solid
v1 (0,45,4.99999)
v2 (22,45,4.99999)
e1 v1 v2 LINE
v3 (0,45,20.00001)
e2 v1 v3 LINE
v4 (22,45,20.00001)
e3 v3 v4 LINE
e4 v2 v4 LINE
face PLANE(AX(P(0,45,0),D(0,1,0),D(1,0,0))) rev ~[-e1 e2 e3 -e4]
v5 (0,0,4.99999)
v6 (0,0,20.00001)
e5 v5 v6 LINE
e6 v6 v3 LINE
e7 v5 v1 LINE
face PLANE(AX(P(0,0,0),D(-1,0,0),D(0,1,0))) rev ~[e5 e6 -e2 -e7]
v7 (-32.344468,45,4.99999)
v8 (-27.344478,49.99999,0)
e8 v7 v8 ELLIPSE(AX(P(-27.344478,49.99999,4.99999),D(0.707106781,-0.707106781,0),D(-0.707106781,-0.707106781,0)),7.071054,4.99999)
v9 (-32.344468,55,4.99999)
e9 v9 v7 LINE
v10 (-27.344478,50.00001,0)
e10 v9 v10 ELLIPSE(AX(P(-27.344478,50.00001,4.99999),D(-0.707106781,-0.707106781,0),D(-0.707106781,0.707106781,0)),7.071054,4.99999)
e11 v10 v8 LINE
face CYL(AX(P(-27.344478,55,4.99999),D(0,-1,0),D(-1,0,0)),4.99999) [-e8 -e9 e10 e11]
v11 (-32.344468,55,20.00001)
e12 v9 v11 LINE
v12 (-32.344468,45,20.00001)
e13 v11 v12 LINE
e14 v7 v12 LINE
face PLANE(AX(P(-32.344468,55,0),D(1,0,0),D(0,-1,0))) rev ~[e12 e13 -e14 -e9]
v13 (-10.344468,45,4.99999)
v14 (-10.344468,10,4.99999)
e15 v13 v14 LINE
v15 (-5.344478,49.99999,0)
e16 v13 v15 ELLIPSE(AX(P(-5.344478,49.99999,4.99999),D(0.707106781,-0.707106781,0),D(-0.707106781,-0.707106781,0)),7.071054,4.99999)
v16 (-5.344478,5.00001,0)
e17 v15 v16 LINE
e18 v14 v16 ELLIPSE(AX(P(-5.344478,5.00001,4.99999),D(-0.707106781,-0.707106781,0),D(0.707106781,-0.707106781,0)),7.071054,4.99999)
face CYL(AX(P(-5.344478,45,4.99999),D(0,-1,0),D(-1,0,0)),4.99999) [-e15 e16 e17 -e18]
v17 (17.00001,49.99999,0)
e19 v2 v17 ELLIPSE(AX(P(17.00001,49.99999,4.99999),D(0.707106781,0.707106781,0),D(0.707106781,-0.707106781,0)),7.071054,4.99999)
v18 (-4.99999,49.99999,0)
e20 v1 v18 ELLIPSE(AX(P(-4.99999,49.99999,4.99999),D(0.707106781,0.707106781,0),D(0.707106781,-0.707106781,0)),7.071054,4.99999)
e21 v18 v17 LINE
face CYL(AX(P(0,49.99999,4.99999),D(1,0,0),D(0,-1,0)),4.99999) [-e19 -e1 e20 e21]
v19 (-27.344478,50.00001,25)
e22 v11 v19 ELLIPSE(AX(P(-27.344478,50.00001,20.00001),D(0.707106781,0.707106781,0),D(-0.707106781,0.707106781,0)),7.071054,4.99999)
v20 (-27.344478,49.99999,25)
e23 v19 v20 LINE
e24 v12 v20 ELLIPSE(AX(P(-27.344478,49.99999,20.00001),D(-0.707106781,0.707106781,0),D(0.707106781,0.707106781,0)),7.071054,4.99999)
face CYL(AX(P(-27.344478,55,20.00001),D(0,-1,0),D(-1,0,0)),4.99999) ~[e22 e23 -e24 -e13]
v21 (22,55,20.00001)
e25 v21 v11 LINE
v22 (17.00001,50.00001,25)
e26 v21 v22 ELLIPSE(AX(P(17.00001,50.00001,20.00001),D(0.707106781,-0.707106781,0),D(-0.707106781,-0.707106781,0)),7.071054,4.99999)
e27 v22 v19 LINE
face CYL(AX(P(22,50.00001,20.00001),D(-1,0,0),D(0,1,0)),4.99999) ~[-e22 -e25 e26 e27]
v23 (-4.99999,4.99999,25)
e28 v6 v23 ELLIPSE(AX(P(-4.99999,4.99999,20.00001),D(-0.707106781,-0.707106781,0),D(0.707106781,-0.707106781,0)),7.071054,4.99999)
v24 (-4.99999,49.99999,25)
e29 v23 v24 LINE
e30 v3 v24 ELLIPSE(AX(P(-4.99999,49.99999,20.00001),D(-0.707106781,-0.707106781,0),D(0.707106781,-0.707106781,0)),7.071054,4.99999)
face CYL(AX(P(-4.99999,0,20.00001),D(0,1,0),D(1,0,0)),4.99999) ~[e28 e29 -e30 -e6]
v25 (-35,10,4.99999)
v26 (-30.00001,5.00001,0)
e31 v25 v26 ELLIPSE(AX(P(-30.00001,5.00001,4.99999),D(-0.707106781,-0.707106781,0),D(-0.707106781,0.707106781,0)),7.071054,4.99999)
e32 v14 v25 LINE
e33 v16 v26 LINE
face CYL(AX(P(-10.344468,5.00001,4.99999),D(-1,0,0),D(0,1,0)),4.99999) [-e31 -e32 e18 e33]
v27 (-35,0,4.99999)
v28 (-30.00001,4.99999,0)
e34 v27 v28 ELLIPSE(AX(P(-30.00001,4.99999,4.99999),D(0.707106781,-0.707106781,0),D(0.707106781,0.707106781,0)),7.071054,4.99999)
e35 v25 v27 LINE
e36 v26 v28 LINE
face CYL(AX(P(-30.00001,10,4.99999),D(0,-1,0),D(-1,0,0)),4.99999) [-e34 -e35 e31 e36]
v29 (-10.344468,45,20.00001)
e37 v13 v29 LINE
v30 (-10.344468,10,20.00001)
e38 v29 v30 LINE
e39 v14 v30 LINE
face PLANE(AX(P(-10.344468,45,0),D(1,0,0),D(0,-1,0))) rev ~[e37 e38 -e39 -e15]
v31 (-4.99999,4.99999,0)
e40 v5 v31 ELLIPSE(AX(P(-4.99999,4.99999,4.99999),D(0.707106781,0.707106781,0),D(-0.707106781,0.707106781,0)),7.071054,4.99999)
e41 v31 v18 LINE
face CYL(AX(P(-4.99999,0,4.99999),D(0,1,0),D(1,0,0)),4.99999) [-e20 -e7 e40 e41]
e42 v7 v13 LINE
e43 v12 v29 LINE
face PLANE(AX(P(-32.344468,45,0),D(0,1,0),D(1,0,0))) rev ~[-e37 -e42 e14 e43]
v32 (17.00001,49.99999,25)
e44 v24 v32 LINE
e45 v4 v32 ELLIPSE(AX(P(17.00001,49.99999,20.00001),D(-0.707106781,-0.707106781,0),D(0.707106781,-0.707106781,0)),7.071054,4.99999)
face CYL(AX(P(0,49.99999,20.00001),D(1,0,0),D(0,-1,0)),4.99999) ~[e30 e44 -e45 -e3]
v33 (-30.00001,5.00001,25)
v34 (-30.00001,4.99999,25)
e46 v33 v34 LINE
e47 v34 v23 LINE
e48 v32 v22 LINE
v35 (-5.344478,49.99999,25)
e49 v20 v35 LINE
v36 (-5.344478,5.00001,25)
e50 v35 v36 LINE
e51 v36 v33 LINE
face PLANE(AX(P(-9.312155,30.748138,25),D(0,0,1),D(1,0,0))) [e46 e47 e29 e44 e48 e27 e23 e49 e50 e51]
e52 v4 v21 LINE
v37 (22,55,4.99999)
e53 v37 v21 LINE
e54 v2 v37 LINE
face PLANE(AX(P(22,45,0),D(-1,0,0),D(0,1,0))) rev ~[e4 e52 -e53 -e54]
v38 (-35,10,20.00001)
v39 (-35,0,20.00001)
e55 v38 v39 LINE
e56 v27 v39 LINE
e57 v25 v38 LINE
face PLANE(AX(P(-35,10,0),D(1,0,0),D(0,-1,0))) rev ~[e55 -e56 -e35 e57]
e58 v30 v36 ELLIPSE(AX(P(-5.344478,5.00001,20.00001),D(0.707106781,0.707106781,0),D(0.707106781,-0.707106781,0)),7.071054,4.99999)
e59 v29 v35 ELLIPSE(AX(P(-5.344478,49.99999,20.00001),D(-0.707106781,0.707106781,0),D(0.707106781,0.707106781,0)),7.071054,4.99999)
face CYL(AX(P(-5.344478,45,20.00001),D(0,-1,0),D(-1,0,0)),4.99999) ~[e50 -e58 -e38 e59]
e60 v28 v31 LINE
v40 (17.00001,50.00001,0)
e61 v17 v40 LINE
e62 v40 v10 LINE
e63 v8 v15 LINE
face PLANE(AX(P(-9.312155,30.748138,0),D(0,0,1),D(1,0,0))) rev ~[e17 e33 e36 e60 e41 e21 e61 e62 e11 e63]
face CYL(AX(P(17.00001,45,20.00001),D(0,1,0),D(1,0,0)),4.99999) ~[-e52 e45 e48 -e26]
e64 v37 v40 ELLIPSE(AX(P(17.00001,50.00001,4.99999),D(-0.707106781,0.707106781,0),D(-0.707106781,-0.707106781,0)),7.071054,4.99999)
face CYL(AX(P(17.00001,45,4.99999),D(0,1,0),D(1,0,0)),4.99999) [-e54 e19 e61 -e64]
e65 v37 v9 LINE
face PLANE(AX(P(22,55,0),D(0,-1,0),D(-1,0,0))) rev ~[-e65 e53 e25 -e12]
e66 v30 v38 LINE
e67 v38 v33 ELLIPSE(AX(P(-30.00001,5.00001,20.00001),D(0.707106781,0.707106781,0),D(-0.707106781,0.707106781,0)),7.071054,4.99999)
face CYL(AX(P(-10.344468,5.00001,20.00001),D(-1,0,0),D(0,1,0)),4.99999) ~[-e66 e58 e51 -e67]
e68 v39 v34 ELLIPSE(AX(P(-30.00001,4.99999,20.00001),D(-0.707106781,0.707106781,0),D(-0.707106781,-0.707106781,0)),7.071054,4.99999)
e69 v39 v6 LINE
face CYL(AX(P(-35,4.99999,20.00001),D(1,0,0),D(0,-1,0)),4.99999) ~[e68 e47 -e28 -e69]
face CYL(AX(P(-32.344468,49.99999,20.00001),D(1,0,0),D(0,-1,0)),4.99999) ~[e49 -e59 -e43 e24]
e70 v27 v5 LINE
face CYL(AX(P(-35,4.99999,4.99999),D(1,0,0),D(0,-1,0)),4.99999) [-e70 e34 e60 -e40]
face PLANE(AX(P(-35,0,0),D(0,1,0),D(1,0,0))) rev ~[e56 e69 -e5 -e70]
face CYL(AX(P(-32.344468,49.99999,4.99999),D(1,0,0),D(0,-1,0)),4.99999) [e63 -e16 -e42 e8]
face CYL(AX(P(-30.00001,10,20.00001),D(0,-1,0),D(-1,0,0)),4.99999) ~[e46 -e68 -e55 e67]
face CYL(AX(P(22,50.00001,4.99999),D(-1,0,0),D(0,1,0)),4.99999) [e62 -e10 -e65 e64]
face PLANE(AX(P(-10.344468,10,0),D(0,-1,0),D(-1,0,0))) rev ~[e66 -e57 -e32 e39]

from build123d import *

# Parameters (mm, degrees)
F1_DEPTH = 25
F2_R     = 4.99999


# Not quite as in the source:
# - a fillet or chamfer is up to 0.001 mm smaller than in the source, because OpenCascade refuses the exact size


with BuildPart() as f1:
    # F0 (on Top) → F1 (new body)
    with BuildSketch(Plane.XY):
        Polygon((-35, 0), (0, 0), (0, 45), (22, 45), (22, 55), (-32.3444679379, 55), (-32.3444679379, 45), (-10.3444679379, 45), (-10.3444679379, 10), (-35, 10), align=None)
    extrude(amount=F1_DEPTH)

    # F2 (radius 5 in the source; OpenCascade refuses exactly that, so slightly less here)
    f2_edges = [f1.edges().sort_by_distance(p)[0] for p in [
        (-5.172234, 55, 0),
        (-32.344468, 50, 0),
        (-10.344468, 27.5, 0),
        (-21.344468, 45, 0),
        (11, 45, 0),
        (22, 50, 0),
        (0, 22.5, 0),
        (-17.5, 0, 0),
        (-22.672234, 10, 0),
        (-35, 5, 0),
        (-5.172234, 55, 25),
        (11, 45, 25),
        (-21.344468, 45, 25),
        (-32.344468, 50, 25),
        (22, 50, 25),
        (-10.344468, 27.5, 25),
        (-22.672234, 10, 25),
        (-35, 5, 25),
        (-17.5, 0, 25),
        (0, 22.5, 25),
    ]]
    fillet(f2_edges, radius=F2_R)


solid = f1.part
